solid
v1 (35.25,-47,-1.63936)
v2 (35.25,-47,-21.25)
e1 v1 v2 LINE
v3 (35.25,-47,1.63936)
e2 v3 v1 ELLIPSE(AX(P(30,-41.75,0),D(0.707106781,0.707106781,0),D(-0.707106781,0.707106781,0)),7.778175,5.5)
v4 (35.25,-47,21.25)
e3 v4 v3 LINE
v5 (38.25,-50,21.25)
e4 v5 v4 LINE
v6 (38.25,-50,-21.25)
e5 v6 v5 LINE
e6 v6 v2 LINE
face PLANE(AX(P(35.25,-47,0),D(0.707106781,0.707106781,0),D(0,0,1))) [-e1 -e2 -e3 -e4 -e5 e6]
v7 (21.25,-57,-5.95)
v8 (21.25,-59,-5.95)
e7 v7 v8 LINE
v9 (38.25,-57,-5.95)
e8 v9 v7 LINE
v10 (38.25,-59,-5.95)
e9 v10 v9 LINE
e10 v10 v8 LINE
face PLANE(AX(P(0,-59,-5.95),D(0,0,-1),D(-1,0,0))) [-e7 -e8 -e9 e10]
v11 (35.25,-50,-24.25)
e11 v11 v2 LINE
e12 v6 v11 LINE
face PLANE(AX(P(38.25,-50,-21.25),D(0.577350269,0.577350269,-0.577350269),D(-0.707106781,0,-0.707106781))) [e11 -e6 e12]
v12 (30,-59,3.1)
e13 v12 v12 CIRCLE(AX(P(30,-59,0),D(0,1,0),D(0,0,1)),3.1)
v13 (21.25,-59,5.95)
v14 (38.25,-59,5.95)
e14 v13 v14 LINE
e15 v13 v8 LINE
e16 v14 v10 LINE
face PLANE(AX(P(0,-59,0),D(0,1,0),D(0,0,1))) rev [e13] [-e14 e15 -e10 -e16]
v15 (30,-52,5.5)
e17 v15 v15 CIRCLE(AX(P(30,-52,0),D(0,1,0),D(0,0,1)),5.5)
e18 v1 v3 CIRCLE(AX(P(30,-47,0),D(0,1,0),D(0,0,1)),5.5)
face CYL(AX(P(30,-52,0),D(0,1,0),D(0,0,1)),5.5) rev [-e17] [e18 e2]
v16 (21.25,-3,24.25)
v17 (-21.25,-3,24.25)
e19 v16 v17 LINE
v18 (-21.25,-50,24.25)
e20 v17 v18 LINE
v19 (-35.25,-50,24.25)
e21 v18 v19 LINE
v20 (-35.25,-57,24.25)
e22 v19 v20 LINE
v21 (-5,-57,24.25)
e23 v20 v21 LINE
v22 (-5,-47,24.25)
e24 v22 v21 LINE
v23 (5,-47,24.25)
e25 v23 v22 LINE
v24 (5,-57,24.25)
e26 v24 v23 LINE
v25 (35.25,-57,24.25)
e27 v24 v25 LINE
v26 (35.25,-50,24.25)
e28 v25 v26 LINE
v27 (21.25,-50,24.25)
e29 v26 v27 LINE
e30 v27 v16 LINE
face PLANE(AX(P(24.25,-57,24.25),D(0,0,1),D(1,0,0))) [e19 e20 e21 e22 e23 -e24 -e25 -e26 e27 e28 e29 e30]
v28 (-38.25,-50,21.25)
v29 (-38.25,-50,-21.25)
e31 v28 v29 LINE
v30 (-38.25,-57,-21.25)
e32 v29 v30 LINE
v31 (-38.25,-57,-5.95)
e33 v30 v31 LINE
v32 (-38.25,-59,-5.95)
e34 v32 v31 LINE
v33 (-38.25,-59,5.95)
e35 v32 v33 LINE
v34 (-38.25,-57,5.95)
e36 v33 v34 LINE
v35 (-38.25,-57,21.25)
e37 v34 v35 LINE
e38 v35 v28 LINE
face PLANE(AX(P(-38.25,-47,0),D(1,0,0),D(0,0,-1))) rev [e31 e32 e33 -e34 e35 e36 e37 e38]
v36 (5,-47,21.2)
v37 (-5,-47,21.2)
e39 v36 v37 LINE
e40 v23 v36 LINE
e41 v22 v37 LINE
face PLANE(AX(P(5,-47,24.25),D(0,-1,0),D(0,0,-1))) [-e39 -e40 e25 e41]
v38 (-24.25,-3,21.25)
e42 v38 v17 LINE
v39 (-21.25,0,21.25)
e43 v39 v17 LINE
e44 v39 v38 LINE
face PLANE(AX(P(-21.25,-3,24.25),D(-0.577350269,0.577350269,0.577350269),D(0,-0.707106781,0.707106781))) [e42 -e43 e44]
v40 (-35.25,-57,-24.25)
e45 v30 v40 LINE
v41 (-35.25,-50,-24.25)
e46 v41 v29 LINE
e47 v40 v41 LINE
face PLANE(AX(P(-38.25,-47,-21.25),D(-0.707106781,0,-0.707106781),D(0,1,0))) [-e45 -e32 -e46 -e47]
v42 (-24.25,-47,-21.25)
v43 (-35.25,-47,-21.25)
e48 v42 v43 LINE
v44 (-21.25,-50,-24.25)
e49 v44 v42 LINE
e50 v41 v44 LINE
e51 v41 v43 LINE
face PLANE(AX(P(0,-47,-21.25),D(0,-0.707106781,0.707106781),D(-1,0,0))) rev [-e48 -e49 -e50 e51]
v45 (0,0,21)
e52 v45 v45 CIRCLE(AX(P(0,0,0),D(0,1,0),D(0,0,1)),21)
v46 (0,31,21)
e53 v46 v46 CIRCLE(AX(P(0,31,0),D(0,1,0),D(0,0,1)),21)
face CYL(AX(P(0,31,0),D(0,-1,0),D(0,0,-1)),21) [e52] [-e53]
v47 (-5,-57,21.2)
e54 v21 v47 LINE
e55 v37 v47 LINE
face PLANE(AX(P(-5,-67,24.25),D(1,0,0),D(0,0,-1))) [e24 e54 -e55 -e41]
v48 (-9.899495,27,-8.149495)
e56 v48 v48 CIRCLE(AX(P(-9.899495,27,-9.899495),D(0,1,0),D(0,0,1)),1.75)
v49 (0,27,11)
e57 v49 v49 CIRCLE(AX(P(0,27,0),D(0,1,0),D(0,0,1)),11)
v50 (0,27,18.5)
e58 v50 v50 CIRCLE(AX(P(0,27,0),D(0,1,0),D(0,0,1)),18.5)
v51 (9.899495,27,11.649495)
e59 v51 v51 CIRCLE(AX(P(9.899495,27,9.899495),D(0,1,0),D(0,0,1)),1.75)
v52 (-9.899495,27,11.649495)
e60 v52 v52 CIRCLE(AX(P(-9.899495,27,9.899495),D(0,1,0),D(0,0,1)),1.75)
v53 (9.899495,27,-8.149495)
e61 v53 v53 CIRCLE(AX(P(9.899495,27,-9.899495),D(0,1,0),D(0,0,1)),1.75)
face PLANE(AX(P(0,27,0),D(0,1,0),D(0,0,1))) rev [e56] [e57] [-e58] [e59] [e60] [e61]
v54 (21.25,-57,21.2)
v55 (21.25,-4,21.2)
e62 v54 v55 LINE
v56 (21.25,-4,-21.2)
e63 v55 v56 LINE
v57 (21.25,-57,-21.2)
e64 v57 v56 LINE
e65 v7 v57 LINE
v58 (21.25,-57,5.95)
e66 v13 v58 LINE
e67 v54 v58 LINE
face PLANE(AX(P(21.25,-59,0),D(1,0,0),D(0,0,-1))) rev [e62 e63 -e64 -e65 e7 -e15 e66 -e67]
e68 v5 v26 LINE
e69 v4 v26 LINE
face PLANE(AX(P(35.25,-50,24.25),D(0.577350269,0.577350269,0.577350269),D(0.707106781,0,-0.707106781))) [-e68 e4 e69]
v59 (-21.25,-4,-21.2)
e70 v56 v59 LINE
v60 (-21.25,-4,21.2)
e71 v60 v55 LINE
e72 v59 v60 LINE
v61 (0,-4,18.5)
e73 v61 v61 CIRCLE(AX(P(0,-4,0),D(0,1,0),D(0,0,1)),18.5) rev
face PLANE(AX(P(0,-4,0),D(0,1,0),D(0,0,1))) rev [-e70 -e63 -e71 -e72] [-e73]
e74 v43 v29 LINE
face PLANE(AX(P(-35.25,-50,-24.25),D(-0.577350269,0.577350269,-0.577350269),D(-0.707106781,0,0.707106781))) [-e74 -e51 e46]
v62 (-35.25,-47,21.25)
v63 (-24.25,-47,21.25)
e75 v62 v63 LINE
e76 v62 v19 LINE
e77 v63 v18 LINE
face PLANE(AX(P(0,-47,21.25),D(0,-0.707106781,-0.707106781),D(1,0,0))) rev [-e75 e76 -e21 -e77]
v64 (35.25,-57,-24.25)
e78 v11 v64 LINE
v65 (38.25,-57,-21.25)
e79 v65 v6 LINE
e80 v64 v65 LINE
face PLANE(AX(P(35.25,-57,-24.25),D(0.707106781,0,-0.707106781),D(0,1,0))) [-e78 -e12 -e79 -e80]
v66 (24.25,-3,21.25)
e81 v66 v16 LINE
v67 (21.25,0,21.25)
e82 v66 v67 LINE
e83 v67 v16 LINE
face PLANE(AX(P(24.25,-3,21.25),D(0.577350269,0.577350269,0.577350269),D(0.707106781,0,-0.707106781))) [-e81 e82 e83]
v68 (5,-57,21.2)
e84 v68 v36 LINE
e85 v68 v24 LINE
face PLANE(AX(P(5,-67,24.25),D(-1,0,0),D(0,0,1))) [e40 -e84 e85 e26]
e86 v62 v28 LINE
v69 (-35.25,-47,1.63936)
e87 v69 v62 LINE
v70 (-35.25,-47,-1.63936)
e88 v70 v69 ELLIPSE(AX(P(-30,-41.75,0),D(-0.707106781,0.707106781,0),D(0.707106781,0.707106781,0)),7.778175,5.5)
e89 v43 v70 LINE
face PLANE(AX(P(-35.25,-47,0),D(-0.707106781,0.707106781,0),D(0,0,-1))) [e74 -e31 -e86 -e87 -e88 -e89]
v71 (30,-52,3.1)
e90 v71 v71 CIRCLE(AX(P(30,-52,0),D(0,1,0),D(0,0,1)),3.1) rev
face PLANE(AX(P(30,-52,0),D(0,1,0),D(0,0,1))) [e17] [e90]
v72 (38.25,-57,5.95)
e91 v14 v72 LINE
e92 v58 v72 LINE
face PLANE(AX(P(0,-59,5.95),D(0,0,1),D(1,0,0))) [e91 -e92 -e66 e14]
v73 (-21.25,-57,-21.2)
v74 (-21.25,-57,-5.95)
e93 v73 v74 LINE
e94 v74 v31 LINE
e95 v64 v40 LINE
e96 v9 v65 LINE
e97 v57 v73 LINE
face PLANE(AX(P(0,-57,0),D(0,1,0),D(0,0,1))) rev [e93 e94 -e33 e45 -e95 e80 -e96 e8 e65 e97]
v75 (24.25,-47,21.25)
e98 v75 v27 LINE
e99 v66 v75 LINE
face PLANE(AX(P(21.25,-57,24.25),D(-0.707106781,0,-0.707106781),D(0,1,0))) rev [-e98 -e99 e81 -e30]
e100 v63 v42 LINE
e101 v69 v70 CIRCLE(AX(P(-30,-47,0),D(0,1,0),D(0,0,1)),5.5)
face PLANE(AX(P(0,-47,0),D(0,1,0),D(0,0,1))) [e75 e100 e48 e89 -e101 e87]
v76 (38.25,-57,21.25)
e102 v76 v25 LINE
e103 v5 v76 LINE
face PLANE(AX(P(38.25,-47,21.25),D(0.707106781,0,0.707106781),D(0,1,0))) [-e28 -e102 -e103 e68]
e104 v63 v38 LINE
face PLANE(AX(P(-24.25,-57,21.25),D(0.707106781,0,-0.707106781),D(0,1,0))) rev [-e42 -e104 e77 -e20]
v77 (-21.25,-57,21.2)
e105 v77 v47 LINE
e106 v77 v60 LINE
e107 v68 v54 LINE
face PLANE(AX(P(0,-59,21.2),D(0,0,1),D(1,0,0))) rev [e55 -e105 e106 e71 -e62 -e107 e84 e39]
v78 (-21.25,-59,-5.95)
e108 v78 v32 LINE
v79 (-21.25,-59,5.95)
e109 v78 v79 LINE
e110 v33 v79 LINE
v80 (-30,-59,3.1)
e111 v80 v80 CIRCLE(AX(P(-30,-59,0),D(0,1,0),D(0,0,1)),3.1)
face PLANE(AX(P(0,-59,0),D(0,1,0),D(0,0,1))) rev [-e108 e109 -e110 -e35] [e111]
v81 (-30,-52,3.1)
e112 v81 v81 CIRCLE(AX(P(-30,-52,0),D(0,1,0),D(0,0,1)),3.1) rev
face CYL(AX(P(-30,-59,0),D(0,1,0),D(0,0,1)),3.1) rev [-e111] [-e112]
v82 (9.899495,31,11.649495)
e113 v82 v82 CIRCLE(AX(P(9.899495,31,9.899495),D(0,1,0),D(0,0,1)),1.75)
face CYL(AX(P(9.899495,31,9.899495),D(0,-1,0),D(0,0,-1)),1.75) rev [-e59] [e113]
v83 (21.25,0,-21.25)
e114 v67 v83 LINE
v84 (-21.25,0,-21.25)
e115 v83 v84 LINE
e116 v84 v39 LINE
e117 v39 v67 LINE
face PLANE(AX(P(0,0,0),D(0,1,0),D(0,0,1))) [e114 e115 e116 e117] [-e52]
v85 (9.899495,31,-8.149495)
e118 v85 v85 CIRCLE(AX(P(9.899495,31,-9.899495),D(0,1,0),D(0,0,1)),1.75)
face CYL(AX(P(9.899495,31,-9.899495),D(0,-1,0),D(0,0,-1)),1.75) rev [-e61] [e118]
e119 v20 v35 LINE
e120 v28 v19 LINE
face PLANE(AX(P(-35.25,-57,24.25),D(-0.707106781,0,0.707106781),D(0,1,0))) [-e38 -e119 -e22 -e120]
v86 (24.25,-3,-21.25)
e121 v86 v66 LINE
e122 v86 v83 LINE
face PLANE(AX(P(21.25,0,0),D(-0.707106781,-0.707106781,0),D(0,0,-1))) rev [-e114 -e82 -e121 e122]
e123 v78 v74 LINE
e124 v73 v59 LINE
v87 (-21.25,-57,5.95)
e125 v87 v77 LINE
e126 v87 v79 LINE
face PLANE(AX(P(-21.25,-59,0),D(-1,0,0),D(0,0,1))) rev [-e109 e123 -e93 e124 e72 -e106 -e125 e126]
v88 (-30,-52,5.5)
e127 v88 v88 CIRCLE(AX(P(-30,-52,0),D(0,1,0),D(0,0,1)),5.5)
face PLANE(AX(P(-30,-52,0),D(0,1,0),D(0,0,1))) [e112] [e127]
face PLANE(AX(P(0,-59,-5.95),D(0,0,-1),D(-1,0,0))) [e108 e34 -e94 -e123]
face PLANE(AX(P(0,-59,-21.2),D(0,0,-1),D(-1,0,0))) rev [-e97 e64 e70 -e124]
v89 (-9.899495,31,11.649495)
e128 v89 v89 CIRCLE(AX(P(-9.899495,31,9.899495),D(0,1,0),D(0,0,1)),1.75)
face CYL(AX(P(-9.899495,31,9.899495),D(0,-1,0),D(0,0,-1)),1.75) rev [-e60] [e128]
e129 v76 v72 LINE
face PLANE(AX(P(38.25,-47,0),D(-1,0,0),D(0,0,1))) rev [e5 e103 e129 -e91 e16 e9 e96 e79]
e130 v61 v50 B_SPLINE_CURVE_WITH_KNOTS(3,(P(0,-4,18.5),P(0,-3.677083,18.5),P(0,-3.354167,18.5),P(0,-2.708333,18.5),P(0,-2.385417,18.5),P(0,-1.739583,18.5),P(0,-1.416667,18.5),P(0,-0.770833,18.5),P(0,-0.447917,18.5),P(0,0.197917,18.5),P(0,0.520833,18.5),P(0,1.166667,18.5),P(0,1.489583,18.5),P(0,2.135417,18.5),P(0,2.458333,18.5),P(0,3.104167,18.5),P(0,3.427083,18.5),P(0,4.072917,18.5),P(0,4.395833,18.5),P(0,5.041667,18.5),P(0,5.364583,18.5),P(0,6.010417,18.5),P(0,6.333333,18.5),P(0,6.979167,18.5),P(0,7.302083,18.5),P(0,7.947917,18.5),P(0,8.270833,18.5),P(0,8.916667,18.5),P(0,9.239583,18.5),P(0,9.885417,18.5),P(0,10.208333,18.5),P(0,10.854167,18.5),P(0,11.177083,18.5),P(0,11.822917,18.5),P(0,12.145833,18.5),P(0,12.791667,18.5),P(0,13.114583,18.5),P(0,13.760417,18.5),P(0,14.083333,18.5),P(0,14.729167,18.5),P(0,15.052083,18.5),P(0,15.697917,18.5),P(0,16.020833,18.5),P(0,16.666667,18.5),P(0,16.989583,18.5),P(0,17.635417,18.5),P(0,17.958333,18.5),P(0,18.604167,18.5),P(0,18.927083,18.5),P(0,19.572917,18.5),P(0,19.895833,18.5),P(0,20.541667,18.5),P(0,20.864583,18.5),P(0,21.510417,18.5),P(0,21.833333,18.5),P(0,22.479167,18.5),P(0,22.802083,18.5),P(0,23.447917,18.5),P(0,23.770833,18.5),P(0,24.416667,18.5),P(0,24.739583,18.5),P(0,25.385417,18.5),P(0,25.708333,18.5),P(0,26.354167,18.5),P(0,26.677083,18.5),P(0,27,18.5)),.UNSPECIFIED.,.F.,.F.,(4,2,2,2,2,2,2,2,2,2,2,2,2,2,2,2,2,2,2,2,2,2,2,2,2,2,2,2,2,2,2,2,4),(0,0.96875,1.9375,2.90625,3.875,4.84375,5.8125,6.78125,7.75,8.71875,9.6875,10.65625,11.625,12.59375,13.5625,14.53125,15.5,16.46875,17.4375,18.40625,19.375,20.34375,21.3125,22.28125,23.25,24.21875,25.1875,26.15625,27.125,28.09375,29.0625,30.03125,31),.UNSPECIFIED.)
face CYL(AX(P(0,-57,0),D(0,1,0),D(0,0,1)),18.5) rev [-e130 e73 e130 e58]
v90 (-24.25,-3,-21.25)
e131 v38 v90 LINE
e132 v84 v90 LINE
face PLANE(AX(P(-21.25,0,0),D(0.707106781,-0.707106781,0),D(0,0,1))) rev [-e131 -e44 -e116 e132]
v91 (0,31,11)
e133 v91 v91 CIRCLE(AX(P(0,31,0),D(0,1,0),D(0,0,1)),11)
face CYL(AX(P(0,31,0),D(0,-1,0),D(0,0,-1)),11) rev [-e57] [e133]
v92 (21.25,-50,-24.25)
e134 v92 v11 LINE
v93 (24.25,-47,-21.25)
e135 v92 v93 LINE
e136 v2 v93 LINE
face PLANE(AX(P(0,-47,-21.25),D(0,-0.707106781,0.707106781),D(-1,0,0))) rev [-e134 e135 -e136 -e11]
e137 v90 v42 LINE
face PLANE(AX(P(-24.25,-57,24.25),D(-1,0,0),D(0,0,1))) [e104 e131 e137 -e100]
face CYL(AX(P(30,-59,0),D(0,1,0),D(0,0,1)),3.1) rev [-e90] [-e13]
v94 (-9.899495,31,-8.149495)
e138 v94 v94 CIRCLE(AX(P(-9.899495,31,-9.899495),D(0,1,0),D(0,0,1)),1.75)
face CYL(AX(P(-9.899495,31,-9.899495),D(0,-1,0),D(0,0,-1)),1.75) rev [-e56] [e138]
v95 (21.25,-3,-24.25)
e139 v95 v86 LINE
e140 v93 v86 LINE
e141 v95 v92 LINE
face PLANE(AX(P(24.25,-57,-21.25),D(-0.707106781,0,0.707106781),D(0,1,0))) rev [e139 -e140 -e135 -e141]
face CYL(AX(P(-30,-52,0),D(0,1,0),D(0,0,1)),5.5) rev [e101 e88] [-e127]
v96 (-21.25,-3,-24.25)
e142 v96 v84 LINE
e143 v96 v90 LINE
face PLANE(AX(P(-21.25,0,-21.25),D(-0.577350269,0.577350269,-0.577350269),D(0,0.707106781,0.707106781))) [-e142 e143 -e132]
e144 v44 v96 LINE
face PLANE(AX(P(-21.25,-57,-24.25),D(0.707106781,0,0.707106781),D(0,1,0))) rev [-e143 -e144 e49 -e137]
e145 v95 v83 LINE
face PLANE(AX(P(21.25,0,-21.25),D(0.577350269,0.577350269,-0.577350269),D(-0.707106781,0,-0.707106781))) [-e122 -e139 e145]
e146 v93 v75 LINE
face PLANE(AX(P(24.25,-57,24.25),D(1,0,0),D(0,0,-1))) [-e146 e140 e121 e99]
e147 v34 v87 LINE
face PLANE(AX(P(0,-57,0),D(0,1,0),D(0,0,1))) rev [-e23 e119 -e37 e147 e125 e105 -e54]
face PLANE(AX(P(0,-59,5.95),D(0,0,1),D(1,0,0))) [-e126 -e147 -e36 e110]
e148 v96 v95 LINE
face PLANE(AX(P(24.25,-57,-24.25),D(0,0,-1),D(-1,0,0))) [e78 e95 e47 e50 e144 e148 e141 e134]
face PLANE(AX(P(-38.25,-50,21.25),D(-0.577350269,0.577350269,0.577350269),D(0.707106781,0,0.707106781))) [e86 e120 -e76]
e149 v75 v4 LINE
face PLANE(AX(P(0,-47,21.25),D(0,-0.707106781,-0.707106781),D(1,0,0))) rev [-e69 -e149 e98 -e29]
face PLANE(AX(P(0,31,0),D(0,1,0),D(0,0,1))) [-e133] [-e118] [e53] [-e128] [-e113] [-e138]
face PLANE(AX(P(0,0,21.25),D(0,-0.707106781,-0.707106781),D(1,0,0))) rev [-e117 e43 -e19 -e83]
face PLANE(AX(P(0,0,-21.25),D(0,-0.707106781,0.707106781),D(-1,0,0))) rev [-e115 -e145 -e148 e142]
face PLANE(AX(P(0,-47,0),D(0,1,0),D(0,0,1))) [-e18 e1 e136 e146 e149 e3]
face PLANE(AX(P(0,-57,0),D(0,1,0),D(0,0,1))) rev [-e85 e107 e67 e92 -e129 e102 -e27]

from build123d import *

# Parameters (mm, degrees)
SKETCH1_R               = 21
SKETCH1_R_2             = 1.75
BOSS_EXTRUDE1_DEPTH     = 31
SKETCH3_W               = 48.5
SKETCH3_H               = 48.5
SKETCH3_R               = 18.5
BOSS_EXTRUDE2_DEPTH     = 57
CUT_EXTRUDE2_DEPTH      = 67.521613029
CUT_EXTRUDE2_DEPTH_BACK = 67.521613029
SKETCH4_R               = 11
SKETCH5_W               = 10
SKETCH5_H               = 20
CUT_EXTRUDE3_DEPTH      = 67.521613029
BOSS_EXTRUDE3_START     = -57
SKETCH6_W               = 14
SKETCH6_H               = 48.5
BOSS_EXTRUDE3_DEPTH     = 10
BOSS_EXTRUDE4_START     = -57
SKETCH7_W               = 76.5
SKETCH7_H               = 11.9
BOSS_EXTRUDE4_DEPTH     = 2
CUT_EXTRUDE1_DEPTH      = 27
CUT_EXTRUDE1_DEPTH_BACK = 75.378256231
SKETCH2_R               = 18.5
SKETCH8_R               = 3.1
CUT_EXTRUDE4_DEPTH      = 75.378256231
CUT_EXTRUDE5_START      = -47
SKETCH9_R               = 5.5
CUT_EXTRUDE5_DEPTH      = 5
CUT_EXTRUDE6_DEPTH      = 53
CUT_EXTRUDE6_DEPTH_BACK = 75.378256231
CUT_EXTRUDE6_START      = -57
SKETCH11_W              = 42.5
SKETCH11_H              = 42.4


with BuildPart() as part:
    # Sketch1 → Boss-Extrude1 (new body)
    with BuildSketch(Plane(origin=(0, 0, 0), x_dir=(1, 0, 0), z_dir=(0, 1, 0))):
        with Locations(Location((0, 0, 0), (0, 0, 270))):
            Circle(SKETCH1_R)
        with Locations(Location((-9.899494937, -9.899494937, 0), (0, 0, 270))):
            Circle(SKETCH1_R_2, mode=Mode.SUBTRACT)
        with Locations(Location((-9.899494937, 9.899494937, 0), (0, 0, 270))):
            Circle(SKETCH1_R_2, mode=Mode.SUBTRACT)
        with Locations(Location((9.899494937, 9.899494937, 0), (0, 0, 270))):
            Circle(SKETCH1_R_2, mode=Mode.SUBTRACT)
        with Locations(Location((9.899494937, -9.899494937, 0), (0, 0, 270))):
            Circle(SKETCH1_R_2, mode=Mode.SUBTRACT)
    extrude(amount=BOSS_EXTRUDE1_DEPTH)

    # Sketch3 → Boss-Extrude2 (add)
    with BuildSketch(Plane(origin=(0, 0, 0), x_dir=(1, 0, 0), z_dir=(0, 1, 0))):
        Rectangle(SKETCH3_W, SKETCH3_H)
        with Locations(Location((0, 0, 0), (0, 0, 270))):
            Circle(SKETCH3_R, mode=Mode.SUBTRACT)
    extrude(amount=-BOSS_EXTRUDE2_DEPTH)

    # Sketch4 → Cut-Extrude2 (cut, two sides: drawn at the far end of the back side and taken through both)
    with BuildSketch(Plane(origin=(0, 0, 0), x_dir=(1, 0, 0), z_dir=(0, 1, 0)).offset(-CUT_EXTRUDE2_DEPTH_BACK)):
        with Locations(Location((0, 0, 0), (0, 0, 270))):
            Circle(SKETCH4_R)
    extrude(amount=CUT_EXTRUDE2_DEPTH + CUT_EXTRUDE2_DEPTH_BACK, mode=Mode.SUBTRACT)

    # Sketch5 → Cut-Extrude3 (cut, through all)
    with BuildSketch(Plane.XY):
        with Locations((0, -57)):
            Rectangle(SKETCH5_W, SKETCH5_H)
    extrude(amount=CUT_EXTRUDE3_DEPTH, mode=Mode.SUBTRACT)

    # Sketch6 → Boss-Extrude3 (add)
    with BuildSketch(Plane(origin=(0, 0, 0), x_dir=(1, 0, 0), z_dir=(0, 1, 0)).offset(BOSS_EXTRUDE3_START)):
        with Locations((-31.25, 0)):
            Rectangle(SKETCH6_W, SKETCH6_H)
        with Locations((31.25, 0)):
            Rectangle(SKETCH6_W, SKETCH6_H)
    extrude(amount=BOSS_EXTRUDE3_DEPTH)

    # Sketch7 → Boss-Extrude4 (add)
    with BuildSketch(Plane(origin=(0, 0, 0), x_dir=(1, 0, 0), z_dir=(0, 1, 0)).offset(BOSS_EXTRUDE4_START)):
        Rectangle(SKETCH7_W, SKETCH7_H)
    extrude(amount=-BOSS_EXTRUDE4_DEPTH)

    # Sketch2 → Cut-Extrude1 (cut, two sides: drawn at the far end of the back side and taken through both)
    with BuildSketch(Plane(origin=(0, 0, 0), x_dir=(1, 0, 0), z_dir=(0, 1, 0)).offset(-CUT_EXTRUDE1_DEPTH_BACK)):
        with Locations(Location((0, 0, 0), (0, 0, 270))):
            Circle(SKETCH2_R)
    extrude(amount=CUT_EXTRUDE1_DEPTH + CUT_EXTRUDE1_DEPTH_BACK, mode=Mode.SUBTRACT)

    # Sketch8 → Cut-Extrude4 (cut, through all)
    with BuildSketch(Plane(origin=(0, 0, 0), x_dir=(1, 0, 0), z_dir=(0, 1, 0))):
        with Locations(Location((-30, 0, 0), (0, 0, 270))):
            Circle(SKETCH8_R)
        with Locations(Location((30, 0, 0), (0, 0, 270))):
            Circle(SKETCH8_R)
    extrude(amount=-CUT_EXTRUDE4_DEPTH, mode=Mode.SUBTRACT)

    # Sketch9 → Cut-Extrude5 (cut)
    with BuildSketch(Plane(origin=(0, 0, 0), x_dir=(1, 0, 0), z_dir=(0, 1, 0)).offset(CUT_EXTRUDE5_START)):
        with Locations(Location((-30, 0, 0), (0, 0, 270))):
            Circle(SKETCH9_R)
        with Locations(Location((30, 0, 0), (0, 0, 270))):
            Circle(SKETCH9_R)
    extrude(amount=-CUT_EXTRUDE5_DEPTH, mode=Mode.SUBTRACT)

    # Chamfer1
    # the kernel refuses this chamfer: 3 mm, written as the material it takes off along each edge
    with BuildSketch(Plane(origin=(-22.25, -2, 22.25), x_dir=(0, -0.7071067811865476, 0.7071067811865476), z_dir=(-0.5773502691896257, 0.5773502691896257, 0.5773502691896257)), Plane(origin=(-22.25, -2, -22.25), x_dir=(-0.7071067811865476, -0.7071067811865476, 0), z_dir=(-0.5773502691896257, 0.5773502691896257, -0.5773502691896257)), Plane(origin=(36.25, -49, 22.25), x_dir=(-1.6747652892626914e-15, 0.7071067811865467, -0.7071067811865483), z_dir=(0.5773502691896266, 0.5773502691896266, 0.577350269189624))) as chamfer1_piece_1:
        Polygon((-2.121320344, 1.224744871), (2.121320344, 1.224744871), (0, -2.449489743), align=None)
    extrude(amount=3.810511777, mode=Mode.SUBTRACT)
    with BuildSketch(Plane(origin=(22.25, -2, 22.25), x_dir=(0, -0.7071067811865476, 0.7071067811865476), z_dir=(0.5773502691896257, 0.5773502691896257, 0.5773502691896257)), Plane(origin=(22.25, -2, -22.25), x_dir=(0.7071067811865476, -0.7071067811865476, 0), z_dir=(0.5773502691896257, 0.5773502691896257, -0.5773502691896257)), Plane(origin=(-36.25, -49, -22.25), x_dir=(0.7071067811865476, 0.7071067811865476, 0), z_dir=(-0.5773502691896264, 0.5773502691896264, -0.5773502691896244)), Plane(origin=(-36.25, -49, 22.25), x_dir=(0.7071067811865479, 0, 0.707106781186547), z_dir=(-0.5773502691896255, 0.5773502691896255, 0.5773502691896262)), Plane(origin=(36.25, -49, -22.25), x_dir=(0.7071067811865476, -0.7071067811865476, 0), z_dir=(0.5773502691896251, 0.5773502691896258, -0.5773502691896265))) as chamfer1_piece_2:
        Polygon((-2.121320344, -1.224744871), (2.121320344, -1.224744871), (0, 2.449489743), align=None)
    extrude(amount=3.810511777, mode=Mode.SUBTRACT)
    with BuildSketch(Plane(origin=(-24.25, 0, 31.965048964), x_dir=(0.9996219169112968, 0.02749587661058636, 0), z_dir=(0, 0, -1)), Plane(origin=(31.965048964, 0, 24.25), x_dir=(0, 0.02749587661058636, -0.9996219169112968), z_dir=(-1, 0, 0)), Plane(origin=(24.25, 0, -31.965048964), x_dir=(-0.9996219169112968, 0.02749587661058636, 0), z_dir=(0, 0, 1)), Plane(origin=(-31.965048964, 0, -24.25), x_dir=(0, 0.02749587661058636, 0.9996219169112968), z_dir=(1, 0, 0))) as chamfer1_piece_3:
        with BuildLine():
            Line((3.086019586, 0), (-0.169641465, 3.081353381))
            Line((-0.169641465, 3.081353381), (-0.22961878, 3.079703628))
            ThreePointArc((-0.22961878, 3.079703628), (-0.102387681, 1.540193489), (-0.059977315, -0.001649753))
            Line((-0.059977315, -0.001649753), (0.001649753, -0.059977315))
            ThreePointArc((0.001649753, -0.059977315), (1.543492994, -0.017566949), (3.087669338, -0.059977315))
            Line((3.087669338, -0.059977315), (3.086019586, 0))
        make_face()
    extrude(amount=63.930097928, mode=Mode.SUBTRACT)
    with BuildSketch(Plane(origin=(-24.25, 7.715048964, -24.25), x_dir=(-0.027495876610586768, 0, 0.9996219169112968), z_dir=(0, -1, 0)), Plane(origin=(-24.25, 7.715048964, 24.25), x_dir=(0.9996219169112965, 0, 0.02749587661058676), z_dir=(0, -1, 0))) as chamfer1_piece_4:
        with BuildLine():
            Line((3.086019586, 0), (-0.169641465, -3.081353381))
            Line((-0.169641465, -3.081353381), (-0.22961878, -3.079703628))
            ThreePointArc((-0.22961878, -3.079703628), (-0.102387681, -1.540193489), (-0.059977315, 0.001649753))
            Line((-0.059977315, 0.001649753), (0.001649753, 0.059977315))
            ThreePointArc((0.001649753, 0.059977315), (1.543492994, 0.017566949), (3.087669338, 0.059977315))
            Line((3.087669338, 0.059977315), (3.086019586, 0))
        make_face()
    extrude(amount=54.715048964, mode=Mode.SUBTRACT)
    with BuildSketch(Plane(origin=(-38.25, -64.715048964, -24.25), x_dir=(0.9996219169112965, 0, -0.027495876610587913), z_dir=(0, 1, 0)), Plane(origin=(38.25, -64.715048964, 24.25), x_dir=(-0.9996219169112965, 0, 0.027495876610587913), z_dir=(0, 1, 0))) as chamfer1_piece_5:
        with BuildLine():
            Line((3.086019586, 0), (-0.169641465, -3.081353381))
            Line((-0.169641465, -3.081353381), (-0.22961878, -3.079703628))
            ThreePointArc((-0.22961878, -3.079703628), (-0.102387681, -1.540193489), (-0.059977315, 0.001649753))
            Line((-0.059977315, 0.001649753), (0.001649753, 0.059977315))
            ThreePointArc((0.001649753, 0.059977315), (1.543492994, 0.017566949), (3.087669338, 0.059977315))
            Line((3.087669338, 0.059977315), (3.086019586, 0))
        make_face()
    extrude(amount=25.430097928, mode=Mode.SUBTRACT)
    with BuildSketch(Plane(origin=(-38.25, -64.715048964, 24.25), x_dir=(0.9996219169112968, 0, 0.027495876610585616), z_dir=(0, 1, 0)), Plane(origin=(38.25, -64.715048964, -24.25), x_dir=(-0.9996219169112968, 0, -0.027495876610585616), z_dir=(0, 1, 0))) as chamfer1_piece_6:
        with BuildLine():
            Line((3.086019586, 0), (-0.169641465, 3.081353381))
            Line((-0.169641465, 3.081353381), (-0.22961878, 3.079703628))
            ThreePointArc((-0.22961878, 3.079703628), (-0.102387681, 1.540193489), (-0.059977315, -0.001649753))
            Line((-0.059977315, -0.001649753), (0.001649753, -0.059977315))
            ThreePointArc((0.001649753, -0.059977315), (1.543492994, -0.017566949), (3.087669338, -0.059977315))
            Line((3.087669338, -0.059977315), (3.086019586, 0))
        make_face()
    extrude(amount=25.430097928, mode=Mode.SUBTRACT)
    with BuildSketch(Plane(origin=(-45.965048964, -47, -24.25), x_dir=(0, -0.9996219169112965, -0.02749587661058676), z_dir=(1, 0, 0)), Plane(origin=(-24.25, -47, 24.25), x_dir=(0, -0.9996219169112965, 0.02749587661058676), z_dir=(-1, 0, 0))) as chamfer1_piece_7:
        with BuildLine():
            Line((3.086019586, 0), (-0.169641465, -3.081353381))
            Line((-0.169641465, -3.081353381), (-0.22961878, -3.079703628))
            ThreePointArc((-0.22961878, -3.079703628), (-0.102387681, -1.540193489), (-0.059977315, 0.001649753))
            Line((-0.059977315, 0.001649753), (0.001649753, 0.059977315))
            ThreePointArc((0.001649753, 0.059977315), (1.543492994, 0.017566949), (3.087669338, 0.059977315))
            Line((3.087669338, 0.059977315), (3.086019586, 0))
        make_face()
    extrude(amount=21.715048964, mode=Mode.SUBTRACT)
    with BuildSketch(Plane(origin=(-38.25, -47, 31.965048964), x_dir=(-0.027495876610586768, -0.9996219169112968, 0), z_dir=(0, 0, -1)), Plane(origin=(38.25, -47, 31.965048964), x_dir=(-0.9996219169112965, 0.02749587661058676, 0), z_dir=(0, 0, -1))) as chamfer1_piece_8:
        with BuildLine():
            Line((3.086019586, 0), (-0.169641465, -3.081353381))
            Line((-0.169641465, -3.081353381), (-0.22961878, -3.079703628))
            ThreePointArc((-0.22961878, -3.079703628), (-0.102387681, -1.540193489), (-0.059977315, 0.001649753))
            Line((-0.059977315, 0.001649753), (0.001649753, 0.059977315))
            ThreePointArc((0.001649753, 0.059977315), (1.543492994, 0.017566949), (3.087669338, 0.059977315))
            Line((3.087669338, 0.059977315), (3.086019586, 0))
        make_face()
    extrude(amount=63.930097928, mode=Mode.SUBTRACT)
    with BuildSketch(Plane(origin=(24.25, 7.715048964, 24.25), x_dir=(-0.9996219169112965, 0, 0.02749587661058676), z_dir=(0, -1, 0)), Plane(origin=(24.25, 7.715048964, -24.25), x_dir=(0.027495876610586768, 0, 0.9996219169112968), z_dir=(0, -1, 0))) as chamfer1_piece_9:
        with BuildLine():
            Line((3.086019586, 0), (-0.169641465, 3.081353381))
            Line((-0.169641465, 3.081353381), (-0.22961878, 3.079703628))
            ThreePointArc((-0.22961878, 3.079703628), (-0.102387681, 1.540193489), (-0.059977315, -0.001649753))
            Line((-0.059977315, -0.001649753), (0.001649753, -0.059977315))
            ThreePointArc((0.001649753, -0.059977315), (1.543492994, -0.017566949), (3.087669338, -0.059977315))
            Line((3.087669338, -0.059977315), (3.086019586, 0))
        make_face()
    extrude(amount=54.715048964, mode=Mode.SUBTRACT)
    with BuildSketch(Plane(origin=(45.965048964, -47, -24.25), x_dir=(0, -0.9996219169112965, -0.02749587661058676), z_dir=(-1, 0, 0)), Plane(origin=(24.25, -47, 24.25), x_dir=(0, -0.9996219169112965, 0.02749587661058676), z_dir=(1, 0, 0))) as chamfer1_piece_10:
        with BuildLine():
            Line((3.086019586, 0), (-0.169641465, 3.081353381))
            Line((-0.169641465, 3.081353381), (-0.22961878, 3.079703628))
            ThreePointArc((-0.22961878, 3.079703628), (-0.102387681, 1.540193489), (-0.059977315, -0.001649753))
            Line((-0.059977315, -0.001649753), (0.001649753, -0.059977315))
            ThreePointArc((0.001649753, -0.059977315), (1.543492994, -0.017566949), (3.087669338, -0.059977315))
            Line((3.087669338, -0.059977315), (3.086019586, 0))
        make_face()
    extrude(amount=21.715048964, mode=Mode.SUBTRACT)
    with BuildSketch(Plane(origin=(-24.25, 7.715048964, -24.25), x_dir=(-0.027495876610586768, 0, 0.9996219169112968), z_dir=(0, -1, 0))) as chamfer1_piece_11a_section:
        with BuildLine():
            Line((3.086019586, 0), (-0.169641465, -3.081353381))
            Line((-0.169641465, -3.081353381), (-0.22961878, -3.079703628))
            ThreePointArc((-0.22961878, -3.079703628), (-0.102387681, -1.540193489), (-0.059977315, 0.001649753))
            Line((-0.059977315, 0.001649753), (0.001649753, 0.059977315))
            ThreePointArc((0.001649753, 0.059977315), (1.543492994, 0.017566949), (3.087669338, 0.059977315))
            Line((3.087669338, 0.059977315), (3.086019586, 0))
        make_face()
    chamfer1_piece_11a = extrude(amount=62.430097928, mode=Mode.PRIVATE)
    chamfer1_piece_11a = split(chamfer1_piece_11a, bisect_by=Plane(origin=(-23.26061912, -47, -23.26061912), z_dir=(0, -1, 0)), keep=Keep.TOP, mode=Mode.PRIVATE)
    with BuildSketch(Plane(origin=(-45.965048964, -47, -24.25), x_dir=(0, -0.9996219169112965, -0.02749587661058676), z_dir=(1, 0, 0))) as chamfer1_piece_11b_section:
        with BuildLine():
            Line((3.086019586, 0), (-0.169641465, -3.081353381))
            Line((-0.169641465, -3.081353381), (-0.22961878, -3.079703628))
            ThreePointArc((-0.22961878, -3.079703628), (-0.102387681, -1.540193489), (-0.059977315, 0.001649753))
            Line((-0.059977315, 0.001649753), (0.001649753, 0.059977315))
            ThreePointArc((0.001649753, 0.059977315), (1.543492994, 0.017566949), (3.087669338, 0.059977315))
            Line((3.087669338, 0.059977315), (3.086019586, 0))
        make_face()
    chamfer1_piece_11b = extrude(amount=29.430097928, mode=Mode.PRIVATE)
    chamfer1_piece_11b = split(chamfer1_piece_11b, bisect_by=Plane(origin=(-24.25, -47.98938088, -23.26061912), z_dir=(1, 0, 0)), keep=Keep.TOP, mode=Mode.PRIVATE)
    chamfer1_piece_11 = chamfer1_piece_11a & chamfer1_piece_11b
    add(chamfer1_piece_11, mode=Mode.SUBTRACT)
    with BuildSketch(Plane(origin=(-16.534951036, -47, 24.25), x_dir=(0, -0.9996219169112965, 0.02749587661058676), z_dir=(-1, 0, 0))) as chamfer1_piece_12a_section:
        with BuildLine():
            Line((3.086019586, 0), (-0.169641465, -3.081353381))
            Line((-0.169641465, -3.081353381), (-0.22961878, -3.079703628))
            ThreePointArc((-0.22961878, -3.079703628), (-0.102387681, -1.540193489), (-0.059977315, 0.001649753))
            Line((-0.059977315, 0.001649753), (0.001649753, 0.059977315))
            ThreePointArc((0.001649753, 0.059977315), (1.543492994, 0.017566949), (3.087669338, 0.059977315))
            Line((3.087669338, 0.059977315), (3.086019586, 0))
        make_face()
    chamfer1_piece_12a = extrude(amount=29.430097928, mode=Mode.PRIVATE)
    chamfer1_piece_12a = split(chamfer1_piece_12a, bisect_by=Plane(origin=(-24.25, -47.98938088, 23.26061912), z_dir=(1, 0, 0)), keep=Keep.TOP, mode=Mode.PRIVATE)
    with BuildSketch(Plane(origin=(-24.25, 7.715048964, 24.25), x_dir=(0.9996219169112965, 0, 0.02749587661058676), z_dir=(0, -1, 0))) as chamfer1_piece_12b_section:
        with BuildLine():
            Line((3.086019586, 0), (-0.169641465, -3.081353381))
            Line((-0.169641465, -3.081353381), (-0.22961878, -3.079703628))
            ThreePointArc((-0.22961878, -3.079703628), (-0.102387681, -1.540193489), (-0.059977315, 0.001649753))
            Line((-0.059977315, 0.001649753), (0.001649753, 0.059977315))
            ThreePointArc((0.001649753, 0.059977315), (1.543492994, 0.017566949), (3.087669338, 0.059977315))
            Line((3.087669338, 0.059977315), (3.086019586, 0))
        make_face()
    chamfer1_piece_12b = extrude(amount=62.430097928, mode=Mode.PRIVATE)
    chamfer1_piece_12b = split(chamfer1_piece_12b, bisect_by=Plane(origin=(-23.26061912, -47, 23.26061912), z_dir=(0, -1, 0)), keep=Keep.TOP, mode=Mode.PRIVATE)
    chamfer1_piece_12 = chamfer1_piece_12a & chamfer1_piece_12b
    add(chamfer1_piece_12, mode=Mode.SUBTRACT)
    with BuildSketch(Plane(origin=(24.25, 7.715048964, 24.25), x_dir=(-0.9996219169112965, 0, 0.02749587661058676), z_dir=(0, -1, 0))) as chamfer1_piece_13a_section:
        with BuildLine():
            Line((3.086019586, 0), (-0.169641465, 3.081353381))
            Line((-0.169641465, 3.081353381), (-0.22961878, 3.079703628))
            ThreePointArc((-0.22961878, 3.079703628), (-0.102387681, 1.540193489), (-0.059977315, -0.001649753))
            Line((-0.059977315, -0.001649753), (0.001649753, -0.059977315))
            ThreePointArc((0.001649753, -0.059977315), (1.543492994, -0.017566949), (3.087669338, -0.059977315))
            Line((3.087669338, -0.059977315), (3.086019586, 0))
        make_face()
    chamfer1_piece_13a = extrude(amount=62.430097928, mode=Mode.PRIVATE)
    chamfer1_piece_13a = split(chamfer1_piece_13a, bisect_by=Plane(origin=(23.26061912, -47, 23.26061912), z_dir=(0, -1, 0)), keep=Keep.TOP, mode=Mode.PRIVATE)
    with BuildSketch(Plane(origin=(16.534951036, -47, 24.25), x_dir=(0, -0.9996219169112965, 0.02749587661058676), z_dir=(1, 0, 0))) as chamfer1_piece_13b_section:
        with BuildLine():
            Line((3.086019586, 0), (-0.169641465, 3.081353381))
            Line((-0.169641465, 3.081353381), (-0.22961878, 3.079703628))
            ThreePointArc((-0.22961878, 3.079703628), (-0.102387681, 1.540193489), (-0.059977315, -0.001649753))
            Line((-0.059977315, -0.001649753), (0.001649753, -0.059977315))
            ThreePointArc((0.001649753, -0.059977315), (1.543492994, -0.017566949), (3.087669338, -0.059977315))
            Line((3.087669338, -0.059977315), (3.086019586, 0))
        make_face()
    chamfer1_piece_13b = extrude(amount=29.430097928, mode=Mode.PRIVATE)
    chamfer1_piece_13b = split(chamfer1_piece_13b, bisect_by=Plane(origin=(24.25, -47.98938088, 23.26061912), z_dir=(-1, 0, 0)), keep=Keep.TOP, mode=Mode.PRIVATE)
    chamfer1_piece_13 = chamfer1_piece_13a & chamfer1_piece_13b
    add(chamfer1_piece_13, mode=Mode.SUBTRACT)
    with BuildSketch(Plane(origin=(24.25, 7.715048964, -24.25), x_dir=(0.027495876610586768, 0, 0.9996219169112968), z_dir=(0, -1, 0))) as chamfer1_piece_14a_section:
        with BuildLine():
            Line((3.086019586, 0), (-0.169641465, 3.081353381))
            Line((-0.169641465, 3.081353381), (-0.22961878, 3.079703628))
            ThreePointArc((-0.22961878, 3.079703628), (-0.102387681, 1.540193489), (-0.059977315, -0.001649753))
            Line((-0.059977315, -0.001649753), (0.001649753, -0.059977315))
            ThreePointArc((0.001649753, -0.059977315), (1.543492994, -0.017566949), (3.087669338, -0.059977315))
            Line((3.087669338, -0.059977315), (3.086019586, 0))
        make_face()
    chamfer1_piece_14a = extrude(amount=62.430097928, mode=Mode.PRIVATE)
    chamfer1_piece_14a = split(chamfer1_piece_14a, bisect_by=Plane(origin=(23.26061912, -47, -23.26061912), z_dir=(0, -1, 0)), keep=Keep.TOP, mode=Mode.PRIVATE)
    with BuildSketch(Plane(origin=(45.965048964, -47, -24.25), x_dir=(0, -0.9996219169112965, -0.02749587661058676), z_dir=(-1, 0, 0))) as chamfer1_piece_14b_section:
        with BuildLine():
            Line((3.086019586, 0), (-0.169641465, 3.081353381))
            Line((-0.169641465, 3.081353381), (-0.22961878, 3.079703628))
            ThreePointArc((-0.22961878, 3.079703628), (-0.102387681, 1.540193489), (-0.059977315, -0.001649753))
            Line((-0.059977315, -0.001649753), (0.001649753, -0.059977315))
            ThreePointArc((0.001649753, -0.059977315), (1.543492994, -0.017566949), (3.087669338, -0.059977315))
            Line((3.087669338, -0.059977315), (3.086019586, 0))
        make_face()
    chamfer1_piece_14b = extrude(amount=29.430097928, mode=Mode.PRIVATE)
    chamfer1_piece_14b = split(chamfer1_piece_14b, bisect_by=Plane(origin=(24.25, -47.98938088, -23.26061912), z_dir=(-1, 0, 0)), keep=Keep.TOP, mode=Mode.PRIVATE)
    chamfer1_piece_14 = chamfer1_piece_14a & chamfer1_piece_14b
    add(chamfer1_piece_14, mode=Mode.SUBTRACT)

    # Sketch11 → Cut-Extrude6 (cut, two sides: drawn at the far end of the back side and taken through both)
    with BuildSketch(Plane(origin=(0, 0, 0), x_dir=(1, 0, 0), z_dir=(0, 1, 0)).offset(CUT_EXTRUDE6_START - CUT_EXTRUDE6_DEPTH_BACK)):
        Rectangle(SKETCH11_W, SKETCH11_H)
    extrude(amount=CUT_EXTRUDE6_DEPTH + CUT_EXTRUDE6_DEPTH_BACK, mode=Mode.SUBTRACT)


solid = part.part
